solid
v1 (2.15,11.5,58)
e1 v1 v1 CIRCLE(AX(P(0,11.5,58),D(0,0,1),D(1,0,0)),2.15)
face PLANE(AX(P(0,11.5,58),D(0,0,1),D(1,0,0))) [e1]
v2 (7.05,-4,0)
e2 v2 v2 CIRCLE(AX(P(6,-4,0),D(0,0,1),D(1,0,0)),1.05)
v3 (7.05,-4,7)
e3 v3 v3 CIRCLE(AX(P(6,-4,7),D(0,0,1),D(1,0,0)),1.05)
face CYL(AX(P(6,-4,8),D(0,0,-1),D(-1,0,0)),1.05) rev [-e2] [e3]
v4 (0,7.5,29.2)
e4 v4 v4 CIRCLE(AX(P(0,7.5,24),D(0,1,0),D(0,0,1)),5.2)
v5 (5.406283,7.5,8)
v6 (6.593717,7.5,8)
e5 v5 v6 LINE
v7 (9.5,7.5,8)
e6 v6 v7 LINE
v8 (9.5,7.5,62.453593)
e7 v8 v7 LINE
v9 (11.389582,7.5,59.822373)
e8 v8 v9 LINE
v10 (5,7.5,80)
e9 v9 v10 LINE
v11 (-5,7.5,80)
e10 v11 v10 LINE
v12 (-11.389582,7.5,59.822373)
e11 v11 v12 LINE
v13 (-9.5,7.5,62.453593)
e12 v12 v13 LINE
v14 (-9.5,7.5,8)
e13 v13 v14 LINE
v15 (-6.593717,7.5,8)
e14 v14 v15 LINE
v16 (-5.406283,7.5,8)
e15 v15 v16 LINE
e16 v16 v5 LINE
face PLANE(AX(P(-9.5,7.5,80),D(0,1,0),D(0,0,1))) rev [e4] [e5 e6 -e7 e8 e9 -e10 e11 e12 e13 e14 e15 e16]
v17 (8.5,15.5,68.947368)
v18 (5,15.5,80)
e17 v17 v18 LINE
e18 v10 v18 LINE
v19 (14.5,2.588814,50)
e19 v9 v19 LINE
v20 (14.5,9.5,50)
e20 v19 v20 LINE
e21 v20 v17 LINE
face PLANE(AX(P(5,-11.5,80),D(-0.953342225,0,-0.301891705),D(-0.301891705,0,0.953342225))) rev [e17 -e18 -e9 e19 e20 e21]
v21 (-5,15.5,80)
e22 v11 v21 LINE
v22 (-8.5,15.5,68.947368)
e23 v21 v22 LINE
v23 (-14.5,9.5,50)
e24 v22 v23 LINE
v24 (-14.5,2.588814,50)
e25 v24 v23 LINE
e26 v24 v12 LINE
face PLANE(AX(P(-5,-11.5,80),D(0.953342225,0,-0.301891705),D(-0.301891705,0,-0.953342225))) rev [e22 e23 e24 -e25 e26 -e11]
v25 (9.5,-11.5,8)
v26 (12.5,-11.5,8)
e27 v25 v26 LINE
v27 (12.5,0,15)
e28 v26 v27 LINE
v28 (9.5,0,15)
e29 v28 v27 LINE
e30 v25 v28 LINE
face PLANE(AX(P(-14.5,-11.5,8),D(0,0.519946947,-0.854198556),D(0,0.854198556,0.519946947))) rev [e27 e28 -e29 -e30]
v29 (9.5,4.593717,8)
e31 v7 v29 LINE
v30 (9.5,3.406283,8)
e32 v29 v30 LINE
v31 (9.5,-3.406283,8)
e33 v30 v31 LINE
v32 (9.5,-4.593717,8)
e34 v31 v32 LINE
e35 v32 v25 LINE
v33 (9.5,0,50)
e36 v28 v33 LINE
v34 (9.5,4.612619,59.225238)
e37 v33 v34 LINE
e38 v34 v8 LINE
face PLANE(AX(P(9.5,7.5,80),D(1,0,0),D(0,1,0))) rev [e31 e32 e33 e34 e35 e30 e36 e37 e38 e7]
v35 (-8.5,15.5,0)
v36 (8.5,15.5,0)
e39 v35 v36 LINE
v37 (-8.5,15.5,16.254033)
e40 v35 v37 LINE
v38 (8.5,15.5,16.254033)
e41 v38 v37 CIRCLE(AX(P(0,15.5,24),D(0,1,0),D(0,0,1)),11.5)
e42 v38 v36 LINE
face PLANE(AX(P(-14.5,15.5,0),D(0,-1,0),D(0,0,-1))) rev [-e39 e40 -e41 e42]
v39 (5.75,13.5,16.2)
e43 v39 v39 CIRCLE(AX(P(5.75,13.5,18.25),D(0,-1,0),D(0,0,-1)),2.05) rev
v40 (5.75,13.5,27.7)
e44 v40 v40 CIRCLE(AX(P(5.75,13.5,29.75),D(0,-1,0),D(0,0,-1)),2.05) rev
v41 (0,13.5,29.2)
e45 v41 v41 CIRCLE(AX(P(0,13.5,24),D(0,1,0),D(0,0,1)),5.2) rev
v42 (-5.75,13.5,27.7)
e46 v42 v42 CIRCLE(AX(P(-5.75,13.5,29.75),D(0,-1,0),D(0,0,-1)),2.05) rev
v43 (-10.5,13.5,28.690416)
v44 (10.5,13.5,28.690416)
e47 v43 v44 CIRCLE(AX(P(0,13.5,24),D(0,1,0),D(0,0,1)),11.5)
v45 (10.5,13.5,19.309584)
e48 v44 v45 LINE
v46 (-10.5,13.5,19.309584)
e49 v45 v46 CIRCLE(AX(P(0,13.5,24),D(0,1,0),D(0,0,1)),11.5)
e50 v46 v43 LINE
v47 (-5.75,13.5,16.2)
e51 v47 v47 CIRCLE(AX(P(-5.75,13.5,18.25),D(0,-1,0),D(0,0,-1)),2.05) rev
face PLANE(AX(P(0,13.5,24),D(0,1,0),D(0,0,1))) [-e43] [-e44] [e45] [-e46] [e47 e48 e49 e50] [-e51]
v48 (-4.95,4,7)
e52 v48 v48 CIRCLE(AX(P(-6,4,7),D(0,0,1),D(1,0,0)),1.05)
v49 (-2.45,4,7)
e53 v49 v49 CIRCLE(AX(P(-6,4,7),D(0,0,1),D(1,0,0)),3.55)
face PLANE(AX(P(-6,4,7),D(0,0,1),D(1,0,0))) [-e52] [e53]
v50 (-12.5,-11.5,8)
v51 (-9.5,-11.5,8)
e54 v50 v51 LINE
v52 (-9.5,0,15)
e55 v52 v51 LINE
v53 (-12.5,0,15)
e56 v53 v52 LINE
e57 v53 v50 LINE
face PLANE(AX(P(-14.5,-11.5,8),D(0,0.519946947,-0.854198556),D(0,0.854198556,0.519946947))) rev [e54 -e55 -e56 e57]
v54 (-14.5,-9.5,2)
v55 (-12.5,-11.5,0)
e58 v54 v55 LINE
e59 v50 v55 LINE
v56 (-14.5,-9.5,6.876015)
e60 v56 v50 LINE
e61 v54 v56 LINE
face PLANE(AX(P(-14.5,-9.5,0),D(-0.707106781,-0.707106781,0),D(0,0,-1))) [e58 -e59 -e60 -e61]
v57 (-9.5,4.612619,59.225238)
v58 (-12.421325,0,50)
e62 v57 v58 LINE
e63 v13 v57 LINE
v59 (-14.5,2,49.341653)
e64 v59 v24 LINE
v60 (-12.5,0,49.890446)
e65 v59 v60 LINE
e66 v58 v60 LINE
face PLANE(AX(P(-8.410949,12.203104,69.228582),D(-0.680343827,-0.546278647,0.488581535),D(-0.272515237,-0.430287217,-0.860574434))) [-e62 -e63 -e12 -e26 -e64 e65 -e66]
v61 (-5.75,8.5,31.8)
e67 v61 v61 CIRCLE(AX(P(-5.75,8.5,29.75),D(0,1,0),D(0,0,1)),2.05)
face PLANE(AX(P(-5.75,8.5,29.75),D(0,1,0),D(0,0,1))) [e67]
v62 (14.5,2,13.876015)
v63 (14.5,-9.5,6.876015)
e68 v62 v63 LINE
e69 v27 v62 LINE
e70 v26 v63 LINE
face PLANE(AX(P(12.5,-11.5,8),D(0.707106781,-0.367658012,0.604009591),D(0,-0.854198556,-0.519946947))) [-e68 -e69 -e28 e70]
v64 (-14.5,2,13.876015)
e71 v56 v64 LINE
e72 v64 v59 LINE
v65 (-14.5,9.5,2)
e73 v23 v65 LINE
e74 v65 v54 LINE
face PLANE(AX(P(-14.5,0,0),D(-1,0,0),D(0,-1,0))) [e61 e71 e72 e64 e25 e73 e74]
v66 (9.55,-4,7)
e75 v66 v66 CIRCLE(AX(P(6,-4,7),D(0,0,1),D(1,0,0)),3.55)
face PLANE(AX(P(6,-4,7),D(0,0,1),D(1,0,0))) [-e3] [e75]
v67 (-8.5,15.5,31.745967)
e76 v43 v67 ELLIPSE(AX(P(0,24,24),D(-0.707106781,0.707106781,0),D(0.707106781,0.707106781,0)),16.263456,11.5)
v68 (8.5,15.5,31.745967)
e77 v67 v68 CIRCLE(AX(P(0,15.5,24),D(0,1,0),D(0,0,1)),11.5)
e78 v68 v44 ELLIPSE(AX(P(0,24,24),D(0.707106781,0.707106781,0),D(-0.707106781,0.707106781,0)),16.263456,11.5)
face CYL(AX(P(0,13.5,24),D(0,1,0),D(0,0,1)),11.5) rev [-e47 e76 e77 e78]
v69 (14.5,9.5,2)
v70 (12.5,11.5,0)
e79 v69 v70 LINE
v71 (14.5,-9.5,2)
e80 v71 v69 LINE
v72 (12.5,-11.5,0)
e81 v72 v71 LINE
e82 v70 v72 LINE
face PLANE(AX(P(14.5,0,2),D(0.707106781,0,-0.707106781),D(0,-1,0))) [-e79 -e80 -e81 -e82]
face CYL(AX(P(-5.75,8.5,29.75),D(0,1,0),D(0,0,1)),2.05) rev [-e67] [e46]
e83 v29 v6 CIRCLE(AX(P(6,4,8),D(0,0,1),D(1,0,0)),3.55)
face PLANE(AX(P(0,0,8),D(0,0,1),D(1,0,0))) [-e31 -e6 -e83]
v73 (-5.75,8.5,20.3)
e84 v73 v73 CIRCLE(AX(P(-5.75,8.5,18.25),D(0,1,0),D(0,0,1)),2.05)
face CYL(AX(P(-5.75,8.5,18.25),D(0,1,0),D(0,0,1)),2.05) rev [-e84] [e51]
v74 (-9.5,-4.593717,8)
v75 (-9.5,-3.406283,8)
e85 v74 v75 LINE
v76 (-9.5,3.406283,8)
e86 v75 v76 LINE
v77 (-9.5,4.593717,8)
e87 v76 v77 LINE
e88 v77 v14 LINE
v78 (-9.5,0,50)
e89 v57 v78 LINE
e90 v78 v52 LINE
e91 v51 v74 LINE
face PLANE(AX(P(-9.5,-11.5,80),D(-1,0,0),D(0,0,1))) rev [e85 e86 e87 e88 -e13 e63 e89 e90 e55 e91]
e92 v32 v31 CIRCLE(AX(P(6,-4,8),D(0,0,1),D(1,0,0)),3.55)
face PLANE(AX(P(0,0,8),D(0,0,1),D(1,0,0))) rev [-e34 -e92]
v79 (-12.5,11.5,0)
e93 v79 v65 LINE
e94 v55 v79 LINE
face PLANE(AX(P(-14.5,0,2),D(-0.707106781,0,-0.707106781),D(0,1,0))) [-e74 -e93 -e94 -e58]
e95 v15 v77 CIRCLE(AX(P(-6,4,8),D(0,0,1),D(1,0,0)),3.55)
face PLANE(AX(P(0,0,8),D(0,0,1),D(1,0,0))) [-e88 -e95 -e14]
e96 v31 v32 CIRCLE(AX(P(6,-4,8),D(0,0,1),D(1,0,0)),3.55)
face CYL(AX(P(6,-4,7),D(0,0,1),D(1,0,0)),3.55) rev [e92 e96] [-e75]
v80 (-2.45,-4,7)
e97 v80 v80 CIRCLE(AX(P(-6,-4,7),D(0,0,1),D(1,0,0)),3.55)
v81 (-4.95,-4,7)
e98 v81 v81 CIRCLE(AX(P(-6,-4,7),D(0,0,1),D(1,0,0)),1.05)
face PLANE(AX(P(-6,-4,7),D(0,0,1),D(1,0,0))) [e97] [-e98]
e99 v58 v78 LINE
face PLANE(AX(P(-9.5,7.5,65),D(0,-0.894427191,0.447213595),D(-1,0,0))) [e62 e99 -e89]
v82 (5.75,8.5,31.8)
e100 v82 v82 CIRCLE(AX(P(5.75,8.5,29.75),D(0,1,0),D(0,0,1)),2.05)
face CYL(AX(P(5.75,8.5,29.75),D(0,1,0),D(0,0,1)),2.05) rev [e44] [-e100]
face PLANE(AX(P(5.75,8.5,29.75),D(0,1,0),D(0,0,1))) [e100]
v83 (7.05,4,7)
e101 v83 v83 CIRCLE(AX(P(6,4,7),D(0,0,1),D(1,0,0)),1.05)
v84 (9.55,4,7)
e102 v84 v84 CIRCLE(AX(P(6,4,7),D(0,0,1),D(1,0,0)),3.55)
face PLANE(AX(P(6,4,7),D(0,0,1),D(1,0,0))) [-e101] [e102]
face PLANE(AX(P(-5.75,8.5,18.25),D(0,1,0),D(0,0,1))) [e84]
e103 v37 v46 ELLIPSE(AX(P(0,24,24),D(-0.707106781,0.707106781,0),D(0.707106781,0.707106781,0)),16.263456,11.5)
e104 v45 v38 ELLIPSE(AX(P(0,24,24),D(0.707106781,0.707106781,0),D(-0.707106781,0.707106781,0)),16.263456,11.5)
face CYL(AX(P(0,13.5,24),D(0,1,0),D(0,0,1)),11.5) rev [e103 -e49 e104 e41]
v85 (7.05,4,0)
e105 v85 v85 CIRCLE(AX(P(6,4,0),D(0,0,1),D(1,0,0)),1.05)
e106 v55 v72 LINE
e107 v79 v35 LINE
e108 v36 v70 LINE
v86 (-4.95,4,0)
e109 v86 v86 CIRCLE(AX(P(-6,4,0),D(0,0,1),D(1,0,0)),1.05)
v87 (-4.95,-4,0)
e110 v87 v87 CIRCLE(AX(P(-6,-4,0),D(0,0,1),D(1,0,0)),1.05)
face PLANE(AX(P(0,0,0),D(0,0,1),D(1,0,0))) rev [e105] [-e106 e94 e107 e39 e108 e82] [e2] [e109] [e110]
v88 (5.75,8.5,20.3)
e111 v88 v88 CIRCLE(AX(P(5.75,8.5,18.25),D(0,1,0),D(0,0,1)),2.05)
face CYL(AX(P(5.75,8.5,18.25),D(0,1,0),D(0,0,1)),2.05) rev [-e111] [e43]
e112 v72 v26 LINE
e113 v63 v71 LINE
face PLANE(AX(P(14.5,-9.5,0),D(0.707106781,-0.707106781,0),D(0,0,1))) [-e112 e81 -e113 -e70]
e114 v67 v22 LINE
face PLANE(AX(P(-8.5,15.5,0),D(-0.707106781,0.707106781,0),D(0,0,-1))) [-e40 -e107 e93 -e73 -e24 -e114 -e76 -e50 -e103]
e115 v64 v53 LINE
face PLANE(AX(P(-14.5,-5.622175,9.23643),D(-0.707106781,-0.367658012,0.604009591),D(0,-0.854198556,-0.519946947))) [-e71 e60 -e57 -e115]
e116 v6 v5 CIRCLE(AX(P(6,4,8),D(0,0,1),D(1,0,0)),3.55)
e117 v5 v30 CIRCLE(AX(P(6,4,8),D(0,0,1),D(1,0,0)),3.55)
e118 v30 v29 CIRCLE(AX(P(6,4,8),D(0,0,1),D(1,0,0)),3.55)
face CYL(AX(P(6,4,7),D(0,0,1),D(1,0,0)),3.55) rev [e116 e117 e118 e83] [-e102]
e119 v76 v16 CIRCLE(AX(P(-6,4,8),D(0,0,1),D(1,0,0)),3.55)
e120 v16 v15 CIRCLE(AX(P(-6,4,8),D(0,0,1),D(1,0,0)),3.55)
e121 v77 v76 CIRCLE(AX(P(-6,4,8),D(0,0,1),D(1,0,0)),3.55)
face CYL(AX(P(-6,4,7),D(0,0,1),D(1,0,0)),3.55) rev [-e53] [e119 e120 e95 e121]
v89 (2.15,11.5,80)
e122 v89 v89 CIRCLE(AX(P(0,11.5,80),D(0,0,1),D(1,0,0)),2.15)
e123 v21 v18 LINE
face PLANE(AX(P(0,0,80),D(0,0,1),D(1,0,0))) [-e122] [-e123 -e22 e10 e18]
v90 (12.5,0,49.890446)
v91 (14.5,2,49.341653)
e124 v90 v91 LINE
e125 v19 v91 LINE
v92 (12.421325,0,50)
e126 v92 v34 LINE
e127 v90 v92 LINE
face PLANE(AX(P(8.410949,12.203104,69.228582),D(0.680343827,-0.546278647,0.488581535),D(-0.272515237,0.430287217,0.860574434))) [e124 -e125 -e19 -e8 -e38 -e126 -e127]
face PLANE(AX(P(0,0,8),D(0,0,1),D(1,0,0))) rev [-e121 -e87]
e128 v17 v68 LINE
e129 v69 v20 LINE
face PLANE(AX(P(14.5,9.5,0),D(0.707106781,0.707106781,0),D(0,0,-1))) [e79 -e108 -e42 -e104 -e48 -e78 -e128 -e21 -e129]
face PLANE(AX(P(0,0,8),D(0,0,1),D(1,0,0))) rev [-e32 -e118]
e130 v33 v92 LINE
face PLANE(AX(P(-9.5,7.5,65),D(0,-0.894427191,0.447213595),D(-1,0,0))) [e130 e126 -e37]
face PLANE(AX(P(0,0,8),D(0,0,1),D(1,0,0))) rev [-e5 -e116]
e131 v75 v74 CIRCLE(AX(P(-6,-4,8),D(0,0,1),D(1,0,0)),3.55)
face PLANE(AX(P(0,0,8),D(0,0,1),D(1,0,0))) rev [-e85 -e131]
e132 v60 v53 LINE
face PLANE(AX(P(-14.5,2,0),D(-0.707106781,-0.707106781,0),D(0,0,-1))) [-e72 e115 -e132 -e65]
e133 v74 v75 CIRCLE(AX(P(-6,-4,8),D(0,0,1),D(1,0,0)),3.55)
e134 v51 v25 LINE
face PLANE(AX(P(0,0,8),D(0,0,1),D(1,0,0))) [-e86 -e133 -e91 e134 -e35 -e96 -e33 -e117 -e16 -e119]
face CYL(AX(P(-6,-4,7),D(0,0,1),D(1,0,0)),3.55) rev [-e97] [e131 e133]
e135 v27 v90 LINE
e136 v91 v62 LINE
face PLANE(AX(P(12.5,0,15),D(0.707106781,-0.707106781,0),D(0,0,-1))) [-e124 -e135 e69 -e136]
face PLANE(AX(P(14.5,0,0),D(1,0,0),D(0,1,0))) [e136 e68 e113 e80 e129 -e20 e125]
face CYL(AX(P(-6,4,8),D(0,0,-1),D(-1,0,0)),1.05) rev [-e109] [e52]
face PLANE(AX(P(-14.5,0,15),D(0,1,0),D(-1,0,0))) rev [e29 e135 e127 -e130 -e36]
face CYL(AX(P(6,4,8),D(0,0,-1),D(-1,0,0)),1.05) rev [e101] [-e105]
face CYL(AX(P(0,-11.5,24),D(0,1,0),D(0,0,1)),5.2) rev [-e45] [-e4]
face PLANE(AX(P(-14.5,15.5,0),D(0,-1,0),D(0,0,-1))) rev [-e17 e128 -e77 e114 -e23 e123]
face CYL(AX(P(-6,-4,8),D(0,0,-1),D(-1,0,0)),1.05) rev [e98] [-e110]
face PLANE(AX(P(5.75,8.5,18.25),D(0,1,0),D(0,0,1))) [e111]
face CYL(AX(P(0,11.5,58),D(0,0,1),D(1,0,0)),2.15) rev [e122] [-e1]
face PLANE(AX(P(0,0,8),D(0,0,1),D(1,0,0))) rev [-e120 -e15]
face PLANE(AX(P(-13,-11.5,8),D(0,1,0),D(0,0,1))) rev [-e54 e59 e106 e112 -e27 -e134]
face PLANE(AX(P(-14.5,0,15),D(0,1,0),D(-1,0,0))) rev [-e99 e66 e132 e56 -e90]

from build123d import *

# Parameters (mm, degrees)
SKETCH1_W           = 26
SKETCH1_H           = 23
SKETCH1_R           = 1.05
BOSS_EXTRUDE1_DEPTH = 8
SKETCH2_R           = 3.55
CUT_EXTRUDE1_DEPTH  = 1
BOSS_EXTRUDE2_DEPTH = 72
SKETCH4_W           = 80
SKETCH4_H           = 23
BOSS_EXTRUDE3_DEPTH = 1.5
SKETCH5_W           = 80
SKETCH5_H           = 23
BOSS_EXTRUDE4_DEPTH = 1.5
SKETCH6_W           = 29
SKETCH6_H           = 80
BOSS_EXTRUDE5_DEPTH = 2
CUT_EXTRUDE2_DEPTH  = 87.15828457
SKETCH8_W           = 30
SKETCH8_H           = 4
BOSS_EXTRUDE6_DEPTH = 29
CUT_EXTRUDE3_DEPTH  = 87.32062326
SKETCH10_W          = 15.789473684
SKETCH10_H          = 7.5
CUT_EXTRUDE4_DEPTH  = 87.874910072
CHAMFER1_SIZE2      = 7.5
CHAMFER1_SIZE       = 15
CHAMFER2_SIZE2      = 7.5
CHAMFER2_SIZE       = 15
CHAMFER3_SIZE       = 4
CHAMFER3_SIZE_2     = 10
SKETCH12_R          = 5.2
CUT_EXTRUDE5_DEPTH  = 86.060272748
SKETCH14_R          = 2.05
CUT_EXTRUDE6_DEPTH  = 5
SKETCH15_R          = 2.15
CUT_EXTRUDE8_DEPTH  = 22
SKETCH21_W          = 29
SKETCH21_H          = 2
CUT_EXTRUDE9_DEPTH  = 84.165497654
BOSS_EXTRUDE7_REACH = 84.768
SKETCH22_W          = 29
SKETCH22_H          = 2
SKETCH23_R          = 5.2
CUT_EXTRUDE10_DEPTH = 86.060272748
SKETCH24_R          = 11.5
CUT_EXTRUDE11_DEPTH = 2
CHAMFER6_SIZE       = 2


# Some blends are built 0.0001 mm under size
with BuildPart() as part:
    # Sketch1 → Boss-Extrude1 (new body)
    with BuildSketch(Plane.XY):
        Rectangle(SKETCH1_W, SKETCH1_H)
        with Locations((-6, 4)):
            Circle(SKETCH1_R, mode=Mode.SUBTRACT)
        with Locations((6, 4)):
            Circle(SKETCH1_R, mode=Mode.SUBTRACT)
        with Locations((-6, -4)):
            Circle(SKETCH1_R, mode=Mode.SUBTRACT)
        with Locations((6, -4)):
            Circle(SKETCH1_R, mode=Mode.SUBTRACT)
    extrude(amount=BOSS_EXTRUDE1_DEPTH)

    # Sketch2 → Cut-Extrude1 (cut)
    with BuildSketch(Plane.XY.offset(8)):
        with Locations((-6, 4)):
            Circle(SKETCH2_R)
        with Locations((6, 4)):
            Circle(SKETCH2_R)
        with Locations((6, -4)):
            Circle(SKETCH2_R)
        with Locations((-6, -4)):
            Circle(SKETCH2_R)
    extrude(amount=-CUT_EXTRUDE1_DEPTH, mode=Mode.SUBTRACT)

    # Sketch3 → Boss-Extrude2 (add)
    with BuildSketch(Plane.XY.offset(8)):
        Polygon((-13, 11.5), (13, 11.5), (13, 7.5), (13, -11.5), (9.5, -11.5), (9.5, 7.5), (-9.5, 7.5), (-9.5, -11.5), (-13, -11.5), (-13, 7.5), align=None)
    extrude(amount=BOSS_EXTRUDE2_DEPTH)

    # Sketch4 → Boss-Extrude3 (add)
    with BuildSketch(Plane.ZY.offset(13)):
        with Locations((40, 0)):
            Rectangle(SKETCH4_W, SKETCH4_H)
    extrude(amount=BOSS_EXTRUDE3_DEPTH)

    # Sketch5 → Boss-Extrude4 (add)
    with BuildSketch(Plane(origin=(13, 0, 0), x_dir=(0, 0, -1), z_dir=(1, 0, 0))):
        with Locations((-40, 0)):
            Rectangle(SKETCH5_W, SKETCH5_H)
    extrude(amount=BOSS_EXTRUDE4_DEPTH)

    # Sketch6 → Boss-Extrude5 (add)
    with BuildSketch(Plane(origin=(0, 11.5, 0), x_dir=(1, 0, 0), z_dir=(0, 1, 0))):
        with Locations((0, -40)):
            Rectangle(SKETCH6_W, SKETCH6_H)
    extrude(amount=BOSS_EXTRUDE5_DEPTH)

    # Sketch7 → Cut-Extrude2 (cut, through all)
    with BuildSketch(Plane(origin=(14.5, 0, 0), x_dir=(0, 0, -1), z_dir=(1, 0, 0))):
        Polygon((-8, -11.5), (-15, 0), (-52, 0), (-80, 7.5), (-80, -11.5), align=None)
    extrude(amount=-CUT_EXTRUDE2_DEPTH, mode=Mode.SUBTRACT)

    # Sketch8 → Boss-Extrude6 (add)
    with BuildSketch(Plane.ZY.offset(14.5)):
        with Locations((65, 15.5)):
            Rectangle(SKETCH8_W, SKETCH8_H)
    extrude(amount=-BOSS_EXTRUDE6_DEPTH)

    # Sketch9 → Cut-Extrude3 (cut, through all)
    with BuildSketch(Plane(origin=(0, 17.5, 0), x_dir=(1, 0, 0), z_dir=(0, 1, 0))):
        Polygon((-5, -80), (-14.5, -50), (-14.5, -80), align=None)
        Polygon((14.5, -50), (14.5, -80), (5, -80), align=None)
    extrude(amount=-CUT_EXTRUDE3_DEPTH, mode=Mode.SUBTRACT)

    # Sketch10 → Cut-Extrude4 (cut, through all)
    with BuildSketch(Plane(origin=(14.5, 0, 0), x_dir=(0, 0, -1), z_dir=(1, 0, 0))):
        with Locations((-57.894736842, 3.75)):
            Rectangle(SKETCH10_W, SKETCH10_H)
    extrude(amount=-CUT_EXTRUDE4_DEPTH, mode=Mode.SUBTRACT)

    # Chamfer1
    chamfer1_edges = [part.edges().sort_by_distance(p)[0] for p in [
        (12, 7.5, 50),
    ]]
    chamfer1_side = [part.faces().sort_by_distance(p)[0] for p in [
        (12, 7.5, 50.15),
    ]]
    chamfer(chamfer1_edges, length=CHAMFER1_SIZE - 0.0001, length2=CHAMFER1_SIZE2 - 0.0001, reference=chamfer1_side[0])  # a hair under: the kernel refuses the full size

    # Chamfer2
    chamfer2_edges = [part.edges().sort_by_distance(p)[0] for p in [
        (-12, 7.5, 50),
    ]]
    chamfer2_side = [part.faces().sort_by_distance(p)[0] for p in [
        (-12, 7.5, 50.15),
    ]]
    chamfer(chamfer2_edges, length=CHAMFER2_SIZE - 0.0001, length2=CHAMFER2_SIZE2 - 0.0001, reference=chamfer2_side[0])  # a hair under: the kernel refuses the full size

    # Chamfer3
    # the kernel refuses this chamfer: 10, 4 mm, written as the material it adds along each edge
    with BuildSketch(Plane(origin=(-14.5, 13.5, 50), x_dir=(0, 0.996016754004022, 0.08916628142572501), z_dir=(1, 0, 0))) as chamfer3_piece_1_section:
        Polygon((CHAMFER3_SIZE * 0.996016754004, -CHAMFER3_SIZE * 0.0891662814257), (-CHAMFER3_SIZE_2 * 0.0891662814257, -CHAMFER3_SIZE_2 * 0.996016754004), (0, 0), align=None)
    chamfer3_piece_1 = extrude(amount=29, mode=Mode.PRIVATE)
    chamfer3_piece_1 = split(chamfer3_piece_1, bisect_by=Plane(origin=(0, 17.5, 46.584895752), z_dir=(0, -1, 0)), keep=Keep.TOP, mode=Mode.PRIVATE)
    chamfer3_piece_1 = split(chamfer3_piece_1, bisect_by=Plane(origin=(-14.161378148, 14.736098837, 51.069332166), z_dir=(0.9533422253507436, 0, -0.3018917046944019)), keep=Keep.TOP, mode=Mode.PRIVATE)
    chamfer3_piece_1 = split(chamfer3_piece_1, bisect_by=Plane(origin=(14.161378148, 14.736098837, 51.069332166), z_dir=(-0.9533422253507436, 0, -0.30189170469440213)), keep=Keep.TOP, mode=Mode.PRIVATE)
    add(chamfer3_piece_1)

    # Sketch12 → Cut-Extrude5 (cut, through all)
    with BuildSketch(Plane(origin=(0, 13.5, 0), x_dir=(1, 0, 0), z_dir=(0, 1, 0))):
        with Locations(Location((0, -24, 0), (0, 0, 270))):
            Circle(SKETCH12_R)
    extrude(amount=-CUT_EXTRUDE5_DEPTH, mode=Mode.SUBTRACT)

    # Sketch14 → Cut-Extrude6 (cut)
    with BuildSketch(Plane(origin=(0, 13.5, 0), x_dir=(1, 0, 0), z_dir=(0, 1, 0))):
        with Locations(Location((5.75, -18.25, 0), (0, 0, 270))):
            Circle(SKETCH14_R)
        with Locations(Location((5.75, -29.75, 0), (0, 0, 270))):
            Circle(SKETCH14_R)
        with Locations(Location((-5.75, -29.75, 0), (0, 0, 270))):
            Circle(SKETCH14_R)
        with Locations(Location((-5.75, -18.25, 0), (0, 0, 270))):
            Circle(SKETCH14_R)
    extrude(amount=-CUT_EXTRUDE6_DEPTH, mode=Mode.SUBTRACT)

    # Sketch15 → Cut-Extrude8 (cut)
    with BuildSketch(Plane.XY.offset(80)):
        with Locations((0, 11.5)):
            Circle(SKETCH15_R)
    extrude(amount=-CUT_EXTRUDE8_DEPTH, mode=Mode.SUBTRACT)

    # Sketch21 → Cut-Extrude9 (cut, through all)
    with BuildSketch(Plane.XY.offset(80)):
        with Locations((0, 16.5)):
            Rectangle(SKETCH21_W, SKETCH21_H)
    extrude(amount=-CUT_EXTRUDE9_DEPTH, mode=Mode.SUBTRACT)

    # Boss-Extrude7: up to this face of the body (flat: up to its plane)
    boss_extrude7_end = Plane(part.part.faces().sort_by_distance((0, 14.5, 42.5))[0])
    # Sketch22 → Boss-Extrude7 (add, up to the picked face)
    with BuildSketch(Plane(origin=(0, 0, 0), x_dir=(-1, 0, 0), z_dir=(0, 0, -1)), mode=Mode.PRIVATE) as boss_extrude7_sk1:
        with Locations((0, 14.5)):
            Rectangle(SKETCH22_W, SKETCH22_H)
    boss_extrude7_tool1 = split(extrude(boss_extrude7_sk1.sketch, amount=-BOSS_EXTRUDE7_REACH, mode=Mode.PRIVATE), bisect_by=boss_extrude7_end, keep=Keep.BOTH, mode=Mode.PRIVATE)
    add(boss_extrude7_tool1.solids().sort_by(Axis((0, 14.5, 0), (0, 0, 1)))[0])

    # Sketch23 → Cut-Extrude10 (cut, through all)
    with BuildSketch(Plane(origin=(0, 13.5, 0), x_dir=(-1, 0, 0), z_dir=(0, -1, 0))):
        with Locations(Location((0, -24, 0), (0, 0, 270))):
            Circle(SKETCH23_R)
    extrude(amount=-CUT_EXTRUDE10_DEPTH, mode=Mode.SUBTRACT)

    # Sketch24 → Cut-Extrude11 (cut)
    with BuildSketch(Plane(origin=(0, 15.5, 0), x_dir=(1, 0, 0), z_dir=(0, 1, 0))):
        with Locations(Location((0, -24, 0), (0, 0, 270))):
            Circle(SKETCH24_R)
    extrude(amount=-CUT_EXTRUDE11_DEPTH, mode=Mode.SUBTRACT)

    # Chamfer4
    # the kernel refuses this chamfer: 6 mm, written as the material it takes off along each edge
    with BuildSketch(Plane(origin=(-14.5, 15.5, 87.032235027), x_dir=(-0.0274958766105865, -0.9996219169112968, 0), z_dir=(0, 0, -1)), Plane(origin=(14.5, 15.5, 87.032235027), x_dir=(-0.9996219169112969, 0.02749587661058649, 0), z_dir=(0, 0, -1))) as chamfer4_piece_1:
        with BuildLine():
            Line((6.172039171, 0), (-0.339282929, -6.162706761))
            Line((-0.339282929, -6.162706761), (-0.459237559, -6.159407256))
            ThreePointArc((-0.459237559, -6.159407256), (-0.204775362, -3.080386978), (-0.11995463, 0.003299505))
            Line((-0.11995463, 0.003299505), (0.003299505, 0.11995463))
            ThreePointArc((0.003299505, 0.11995463), (3.086985988, 0.035133898), (6.175338676, 0.11995463))
            Line((6.175338676, 0.11995463), (6.172039171, 0))
        make_face()
    extrude(amount=124.064470053, mode=Mode.SUBTRACT)

    # Chamfer5
    # the kernel refuses this chamfer: 2.336899136, 2 mm, written as the material it takes off along each edge
    with BuildSketch(Plane(origin=(-8.106777279, 10.094594893, 70.189124382), x_dir=(0.961659390492848, -0.1504091467073527, -0.22932140166955664), z_dir=(-0.2725155737769916, -0.43028487946482336, -0.8605754961378691))) as chamfer5_piece_1_section:
        with BuildLine():
            Line((2.067154496, 0), (-0.457557549, -2.368181214))
            Line((-0.457557549, -2.368181214), (-0.503642169, -2.360393606))
            ThreePointArc((-0.503642169, -2.360393606), (-0.246974517, -1.1810158), (-0.04608462, 0.007787608))
            Line((-0.04608462, 0.007787608), (0.001494452, 0.046714084))
            ThreePointArc((0.001494452, 0.046714084), (1.034014963, 0.013682238), (2.068648949, 0.046714084))
            Line((2.068648949, 0.046714084), (2.067154496, 0))
        make_face()
    chamfer5_piece_1 = extrude(amount=29.489973718, mode=Mode.PRIVATE)
    chamfer5_piece_1 = split(chamfer5_piece_1, bisect_by=Plane(origin=(-11.667443521, 7.5, 56.707905071), z_dir=(0, -1, 0)), keep=Keep.TOP, mode=Mode.PRIVATE)
    add(chamfer5_piece_1, mode=Mode.SUBTRACT)
    with BuildSketch(Plane(origin=(8.106777279, 10.094594893, 70.189124382), x_dir=(-0.961659390492848, -0.1504091467073528, -0.22932140166955695), z_dir=(0.27251557377699187, -0.4302848794648234, -0.860575496137869))) as chamfer5_piece_2_section:
        with BuildLine():
            Line((2.067154496, 0), (-0.457557549, 2.368181214))
            Line((-0.457557549, 2.368181214), (-0.503642169, 2.360393606))
            ThreePointArc((-0.503642169, 2.360393606), (-0.246974517, 1.1810158), (-0.04608462, -0.007787608))
            Line((-0.04608462, -0.007787608), (0.001494452, -0.046714084))
            ThreePointArc((0.001494452, -0.046714084), (1.034014963, -0.013682238), (2.068648949, -0.046714084))
            Line((2.068648949, -0.046714084), (2.067154496, 0))
        make_face()
    chamfer5_piece_2 = extrude(amount=29.489973718, mode=Mode.PRIVATE)
    chamfer5_piece_2 = split(chamfer5_piece_2, bisect_by=Plane(origin=(11.667443521, 7.5, 56.707905071), z_dir=(0, -1, 0)), keep=Keep.TOP, mode=Mode.PRIVATE)
    add(chamfer5_piece_2, mode=Mode.SUBTRACT)
    with BuildSketch(Plane(origin=(14.5, 0, 9.856634024), x_dir=(0.02749587661058647, 0.9996219169112968, 0), z_dir=(0, 0, 1))) as chamfer5_piece_3_section:
        with BuildLine():
            Line((2.05734639, 0), (-0.11309431, 2.054235587))
            Line((-0.11309431, 2.054235587), (-0.153079186, 2.053135752))
            ThreePointArc((-0.153079186, 2.053135752), (-0.068258454, 1.026795659), (-0.039984877, -0.001099835))
            Line((-0.039984877, -0.001099835), (0.001099835, -0.039984877))
            ThreePointArc((0.001099835, -0.039984877), (1.028995329, -0.011711299), (2.058446225, -0.039984877))
            Line((2.058446225, -0.039984877), (2.05734639, 0))
        make_face()
    chamfer5_piece_3 = extrude(amount=45.286731952, mode=Mode.PRIVATE)
    chamfer5_piece_3 = split(chamfer5_piece_3, bisect_by=Plane(origin=(13.83833288, 9.481660415, 20.77144547), z_dir=(0, -0.5199469468957453, 0.8541985556144386)), keep=Keep.TOP, mode=Mode.PRIVATE)
    add(chamfer5_piece_3, mode=Mode.SUBTRACT)
    with BuildSketch(Plane(origin=(-14.5, 4.393455788, 17.674277436), x_dir=(-0.027495876610586452, 0.519750363748101, -0.8538755975861659), z_dir=(0, -0.8541985556144386, -0.5199469468957453))) as chamfer5_piece_4_section:
        with BuildLine():
            Line((2.05734639, 0), (-0.11309431, 2.054235587))
            Line((-0.11309431, 2.054235587), (-0.153079186, 2.053135752))
            ThreePointArc((-0.153079186, 2.053135752), (-0.068258454, 1.026795659), (-0.039984877, -0.001099835))
            Line((-0.039984877, -0.001099835), (0.001099835, -0.039984877))
            ThreePointArc((0.001099835, -0.039984877), (1.028995329, -0.011711299), (2.058446225, -0.039984877))
            Line((2.058446225, -0.039984877), (2.05734639, 0))
        make_face()
    chamfer5_piece_4 = extrude(amount=23.74964397, mode=Mode.PRIVATE)
    chamfer5_piece_4 = split(chamfer5_piece_4, bisect_by=Plane(origin=(-13.835872305, 0, 9.503665371), z_dir=(0, -1, 0)), keep=Keep.TOP, mode=Mode.PRIVATE)
    add(chamfer5_piece_4, mode=Mode.SUBTRACT)
    with BuildSketch(Plane(origin=(14.5, -15.893455788, 5.325722564), x_dir=(0.027495876610586504, 0.5197503637481011, -0.8538755975861659), z_dir=(0, 0.8541985556144386, 0.5199469468957453))) as chamfer5_piece_5_section:
        with BuildLine():
            Line((2.05734639, 0), (-0.11309431, 2.054235587))
            Line((-0.11309431, 2.054235587), (-0.153079186, 2.053135752))
            ThreePointArc((-0.153079186, 2.053135752), (-0.068258454, 1.026795659), (-0.039984877, -0.001099835))
            Line((-0.039984877, -0.001099835), (0.001099835, -0.039984877))
            ThreePointArc((0.001099835, -0.039984877), (1.028995329, -0.011711299), (2.058446225, -0.039984877))
            Line((2.058446225, -0.039984877), (2.05734639, 0))
        make_face()
    chamfer5_piece_5 = extrude(amount=23.74964397, mode=Mode.PRIVATE)
    chamfer5_piece_5 = split(chamfer5_piece_5, bisect_by=Plane(origin=(13.835872305, 0, 9.503665371), z_dir=(0, -1, 0)), keep=Keep.TOP, mode=Mode.PRIVATE)
    add(chamfer5_piece_5, mode=Mode.SUBTRACT)
    with BuildSketch(Plane(origin=(14.5, -11.5, 13.143365976), x_dir=(0.027495876610586438, 0.9996219169112968, 0), z_dir=(0, 0, -1)), Plane(origin=(-14.5, -11.5, -5.143365976), x_dir=(-0.027495876610586487, 0.9996219169112968, 0), z_dir=(0, 0, 1))) as chamfer5_piece_6:
        with BuildLine():
            Line((2.05734639, 0), (-0.11309431, -2.054235587))
            Line((-0.11309431, -2.054235587), (-0.153079186, -2.053135752))
            ThreePointArc((-0.153079186, -2.053135752), (-0.068258454, -1.026795659), (-0.039984877, 0.001099835))
            Line((-0.039984877, 0.001099835), (0.001099835, 0.039984877))
            ThreePointArc((0.001099835, 0.039984877), (1.028995329, 0.011711299), (2.058446225, 0.039984877))
            Line((2.058446225, 0.039984877), (2.05734639, 0))
        make_face()
    extrude(amount=18.286731952, mode=Mode.SUBTRACT)
    with BuildSketch(Plane(origin=(-14.5, 0, 55.143365976), x_dir=(-0.027495876610586494, 0.9996219169112968, 0), z_dir=(0, 0, -1))) as chamfer5_piece_7_section:
        with BuildLine():
            Line((2.05734639, 0), (-0.11309431, 2.054235587))
            Line((-0.11309431, 2.054235587), (-0.153079186, 2.053135752))
            ThreePointArc((-0.153079186, 2.053135752), (-0.068258454, 1.026795659), (-0.039984877, -0.001099835))
            Line((-0.039984877, -0.001099835), (0.001099835, -0.039984877))
            ThreePointArc((0.001099835, -0.039984877), (1.028995329, -0.011711299), (2.058446225, -0.039984877))
            Line((2.058446225, -0.039984877), (2.05734639, 0))
        make_face()
    chamfer5_piece_7 = extrude(amount=45.286731952, mode=Mode.PRIVATE)
    chamfer5_piece_7 = split(chamfer5_piece_7, bisect_by=Plane(origin=(-13.83833288, 9.481660415, 20.77144547), z_dir=(0, -0.5199469468957453, 0.8541985556144386)), keep=Keep.TOP, mode=Mode.PRIVATE)
    add(chamfer5_piece_7, mode=Mode.SUBTRACT)
    with BuildSketch(Plane(origin=(14.5, 0, 9.856634024), x_dir=(0.02749587661058647, 0.9996219169112968, 0), z_dir=(0, 0, 1))) as chamfer5_piece_8a_section:
        with BuildLine():
            Line((2.05734639, 0), (-0.11309431, 2.054235587))
            Line((-0.11309431, 2.054235587), (-0.153079186, 2.053135752))
            ThreePointArc((-0.153079186, 2.053135752), (-0.068258454, 1.026795659), (-0.039984877, -0.001099835))
            Line((-0.039984877, -0.001099835), (0.001099835, -0.039984877))
            ThreePointArc((0.001099835, -0.039984877), (1.028995329, -0.011711299), (2.058446225, -0.039984877))
            Line((2.058446225, -0.039984877), (2.05734639, 0))
        make_face()
    chamfer5_piece_8a = extrude(amount=45.286731952, mode=Mode.PRIVATE)
    chamfer5_piece_8a = split(chamfer5_piece_8a, bisect_by=Plane(origin=(13.855319863, -0.547637516, 14.666655425), z_dir=(0, 0.5199469468957453, -0.8541985556144386)), keep=Keep.TOP, mode=Mode.PRIVATE)
    with BuildSketch(Plane(origin=(14.5, -15.893455788, 5.325722564), x_dir=(0.027495876610586504, 0.5197503637481011, -0.8538755975861659), z_dir=(0, 0.8541985556144386, 0.5199469468957453))) as chamfer5_piece_8b_section:
        with BuildLine():
            Line((2.05734639, 0), (-0.11309431, 2.054235587))
            Line((-0.11309431, 2.054235587), (-0.153079186, 2.053135752))
            ThreePointArc((-0.153079186, 2.053135752), (-0.068258454, 1.026795659), (-0.039984877, -0.001099835))
            Line((-0.039984877, -0.001099835), (0.001099835, -0.039984877))
            ThreePointArc((0.001099835, -0.039984877), (1.028995329, -0.011711299), (2.058446225, -0.039984877))
            Line((2.058446225, -0.039984877), (2.05734639, 0))
        make_face()
    chamfer5_piece_8b = extrude(amount=23.74964397, mode=Mode.PRIVATE)
    chamfer5_piece_8b = split(chamfer5_piece_8b, bisect_by=Plane(origin=(13.855319863, 0, 15.64111267), z_dir=(0, 1, 0)), keep=Keep.TOP, mode=Mode.PRIVATE)
    chamfer5_piece_8 = chamfer5_piece_8a & chamfer5_piece_8b
    add(chamfer5_piece_8, mode=Mode.SUBTRACT)
    with BuildSketch(Plane(origin=(-14.5, 0, 55.143365976), x_dir=(-0.027495876610586494, 0.9996219169112968, 0), z_dir=(0, 0, -1))) as chamfer5_piece_9a_section:
        with BuildLine():
            Line((2.05734639, 0), (-0.11309431, 2.054235587))
            Line((-0.11309431, 2.054235587), (-0.153079186, 2.053135752))
            ThreePointArc((-0.153079186, 2.053135752), (-0.068258454, 1.026795659), (-0.039984877, -0.001099835))
            Line((-0.039984877, -0.001099835), (0.001099835, -0.039984877))
            ThreePointArc((0.001099835, -0.039984877), (1.028995329, -0.011711299), (2.058446225, -0.039984877))
            Line((2.058446225, -0.039984877), (2.05734639, 0))
        make_face()
    chamfer5_piece_9a = extrude(amount=45.286731952, mode=Mode.PRIVATE)
    chamfer5_piece_9a = split(chamfer5_piece_9a, bisect_by=Plane(origin=(-13.855319863, -0.547637516, 14.666655425), z_dir=(0, 0.5199469468957453, -0.8541985556144386)), keep=Keep.TOP, mode=Mode.PRIVATE)
    with BuildSketch(Plane(origin=(-14.5, 4.393455788, 17.674277436), x_dir=(-0.027495876610586452, 0.519750363748101, -0.8538755975861659), z_dir=(0, -0.8541985556144386, -0.5199469468957453))) as chamfer5_piece_9b_section:
        with BuildLine():
            Line((2.05734639, 0), (-0.11309431, 2.054235587))
            Line((-0.11309431, 2.054235587), (-0.153079186, 2.053135752))
            ThreePointArc((-0.153079186, 2.053135752), (-0.068258454, 1.026795659), (-0.039984877, -0.001099835))
            Line((-0.039984877, -0.001099835), (0.001099835, -0.039984877))
            ThreePointArc((0.001099835, -0.039984877), (1.028995329, -0.011711299), (2.058446225, -0.039984877))
            Line((2.058446225, -0.039984877), (2.05734639, 0))
        make_face()
    chamfer5_piece_9b = extrude(amount=23.74964397, mode=Mode.PRIVATE)
    chamfer5_piece_9b = split(chamfer5_piece_9b, bisect_by=Plane(origin=(-13.855319863, 0, 15.64111267), z_dir=(0, 1, 0)), keep=Keep.TOP, mode=Mode.PRIVATE)
    chamfer5_piece_9 = chamfer5_piece_9a & chamfer5_piece_9b
    add(chamfer5_piece_9, mode=Mode.SUBTRACT)

    # Chamfer6
    chamfer6_edges = [part.edges().sort_by_distance(p)[0] for p in [
        (14.5, 0, 0),
        (-14.5, 0, 0),
    ]]
    chamfer(chamfer6_edges, length=CHAMFER6_SIZE)


solid = part.part
